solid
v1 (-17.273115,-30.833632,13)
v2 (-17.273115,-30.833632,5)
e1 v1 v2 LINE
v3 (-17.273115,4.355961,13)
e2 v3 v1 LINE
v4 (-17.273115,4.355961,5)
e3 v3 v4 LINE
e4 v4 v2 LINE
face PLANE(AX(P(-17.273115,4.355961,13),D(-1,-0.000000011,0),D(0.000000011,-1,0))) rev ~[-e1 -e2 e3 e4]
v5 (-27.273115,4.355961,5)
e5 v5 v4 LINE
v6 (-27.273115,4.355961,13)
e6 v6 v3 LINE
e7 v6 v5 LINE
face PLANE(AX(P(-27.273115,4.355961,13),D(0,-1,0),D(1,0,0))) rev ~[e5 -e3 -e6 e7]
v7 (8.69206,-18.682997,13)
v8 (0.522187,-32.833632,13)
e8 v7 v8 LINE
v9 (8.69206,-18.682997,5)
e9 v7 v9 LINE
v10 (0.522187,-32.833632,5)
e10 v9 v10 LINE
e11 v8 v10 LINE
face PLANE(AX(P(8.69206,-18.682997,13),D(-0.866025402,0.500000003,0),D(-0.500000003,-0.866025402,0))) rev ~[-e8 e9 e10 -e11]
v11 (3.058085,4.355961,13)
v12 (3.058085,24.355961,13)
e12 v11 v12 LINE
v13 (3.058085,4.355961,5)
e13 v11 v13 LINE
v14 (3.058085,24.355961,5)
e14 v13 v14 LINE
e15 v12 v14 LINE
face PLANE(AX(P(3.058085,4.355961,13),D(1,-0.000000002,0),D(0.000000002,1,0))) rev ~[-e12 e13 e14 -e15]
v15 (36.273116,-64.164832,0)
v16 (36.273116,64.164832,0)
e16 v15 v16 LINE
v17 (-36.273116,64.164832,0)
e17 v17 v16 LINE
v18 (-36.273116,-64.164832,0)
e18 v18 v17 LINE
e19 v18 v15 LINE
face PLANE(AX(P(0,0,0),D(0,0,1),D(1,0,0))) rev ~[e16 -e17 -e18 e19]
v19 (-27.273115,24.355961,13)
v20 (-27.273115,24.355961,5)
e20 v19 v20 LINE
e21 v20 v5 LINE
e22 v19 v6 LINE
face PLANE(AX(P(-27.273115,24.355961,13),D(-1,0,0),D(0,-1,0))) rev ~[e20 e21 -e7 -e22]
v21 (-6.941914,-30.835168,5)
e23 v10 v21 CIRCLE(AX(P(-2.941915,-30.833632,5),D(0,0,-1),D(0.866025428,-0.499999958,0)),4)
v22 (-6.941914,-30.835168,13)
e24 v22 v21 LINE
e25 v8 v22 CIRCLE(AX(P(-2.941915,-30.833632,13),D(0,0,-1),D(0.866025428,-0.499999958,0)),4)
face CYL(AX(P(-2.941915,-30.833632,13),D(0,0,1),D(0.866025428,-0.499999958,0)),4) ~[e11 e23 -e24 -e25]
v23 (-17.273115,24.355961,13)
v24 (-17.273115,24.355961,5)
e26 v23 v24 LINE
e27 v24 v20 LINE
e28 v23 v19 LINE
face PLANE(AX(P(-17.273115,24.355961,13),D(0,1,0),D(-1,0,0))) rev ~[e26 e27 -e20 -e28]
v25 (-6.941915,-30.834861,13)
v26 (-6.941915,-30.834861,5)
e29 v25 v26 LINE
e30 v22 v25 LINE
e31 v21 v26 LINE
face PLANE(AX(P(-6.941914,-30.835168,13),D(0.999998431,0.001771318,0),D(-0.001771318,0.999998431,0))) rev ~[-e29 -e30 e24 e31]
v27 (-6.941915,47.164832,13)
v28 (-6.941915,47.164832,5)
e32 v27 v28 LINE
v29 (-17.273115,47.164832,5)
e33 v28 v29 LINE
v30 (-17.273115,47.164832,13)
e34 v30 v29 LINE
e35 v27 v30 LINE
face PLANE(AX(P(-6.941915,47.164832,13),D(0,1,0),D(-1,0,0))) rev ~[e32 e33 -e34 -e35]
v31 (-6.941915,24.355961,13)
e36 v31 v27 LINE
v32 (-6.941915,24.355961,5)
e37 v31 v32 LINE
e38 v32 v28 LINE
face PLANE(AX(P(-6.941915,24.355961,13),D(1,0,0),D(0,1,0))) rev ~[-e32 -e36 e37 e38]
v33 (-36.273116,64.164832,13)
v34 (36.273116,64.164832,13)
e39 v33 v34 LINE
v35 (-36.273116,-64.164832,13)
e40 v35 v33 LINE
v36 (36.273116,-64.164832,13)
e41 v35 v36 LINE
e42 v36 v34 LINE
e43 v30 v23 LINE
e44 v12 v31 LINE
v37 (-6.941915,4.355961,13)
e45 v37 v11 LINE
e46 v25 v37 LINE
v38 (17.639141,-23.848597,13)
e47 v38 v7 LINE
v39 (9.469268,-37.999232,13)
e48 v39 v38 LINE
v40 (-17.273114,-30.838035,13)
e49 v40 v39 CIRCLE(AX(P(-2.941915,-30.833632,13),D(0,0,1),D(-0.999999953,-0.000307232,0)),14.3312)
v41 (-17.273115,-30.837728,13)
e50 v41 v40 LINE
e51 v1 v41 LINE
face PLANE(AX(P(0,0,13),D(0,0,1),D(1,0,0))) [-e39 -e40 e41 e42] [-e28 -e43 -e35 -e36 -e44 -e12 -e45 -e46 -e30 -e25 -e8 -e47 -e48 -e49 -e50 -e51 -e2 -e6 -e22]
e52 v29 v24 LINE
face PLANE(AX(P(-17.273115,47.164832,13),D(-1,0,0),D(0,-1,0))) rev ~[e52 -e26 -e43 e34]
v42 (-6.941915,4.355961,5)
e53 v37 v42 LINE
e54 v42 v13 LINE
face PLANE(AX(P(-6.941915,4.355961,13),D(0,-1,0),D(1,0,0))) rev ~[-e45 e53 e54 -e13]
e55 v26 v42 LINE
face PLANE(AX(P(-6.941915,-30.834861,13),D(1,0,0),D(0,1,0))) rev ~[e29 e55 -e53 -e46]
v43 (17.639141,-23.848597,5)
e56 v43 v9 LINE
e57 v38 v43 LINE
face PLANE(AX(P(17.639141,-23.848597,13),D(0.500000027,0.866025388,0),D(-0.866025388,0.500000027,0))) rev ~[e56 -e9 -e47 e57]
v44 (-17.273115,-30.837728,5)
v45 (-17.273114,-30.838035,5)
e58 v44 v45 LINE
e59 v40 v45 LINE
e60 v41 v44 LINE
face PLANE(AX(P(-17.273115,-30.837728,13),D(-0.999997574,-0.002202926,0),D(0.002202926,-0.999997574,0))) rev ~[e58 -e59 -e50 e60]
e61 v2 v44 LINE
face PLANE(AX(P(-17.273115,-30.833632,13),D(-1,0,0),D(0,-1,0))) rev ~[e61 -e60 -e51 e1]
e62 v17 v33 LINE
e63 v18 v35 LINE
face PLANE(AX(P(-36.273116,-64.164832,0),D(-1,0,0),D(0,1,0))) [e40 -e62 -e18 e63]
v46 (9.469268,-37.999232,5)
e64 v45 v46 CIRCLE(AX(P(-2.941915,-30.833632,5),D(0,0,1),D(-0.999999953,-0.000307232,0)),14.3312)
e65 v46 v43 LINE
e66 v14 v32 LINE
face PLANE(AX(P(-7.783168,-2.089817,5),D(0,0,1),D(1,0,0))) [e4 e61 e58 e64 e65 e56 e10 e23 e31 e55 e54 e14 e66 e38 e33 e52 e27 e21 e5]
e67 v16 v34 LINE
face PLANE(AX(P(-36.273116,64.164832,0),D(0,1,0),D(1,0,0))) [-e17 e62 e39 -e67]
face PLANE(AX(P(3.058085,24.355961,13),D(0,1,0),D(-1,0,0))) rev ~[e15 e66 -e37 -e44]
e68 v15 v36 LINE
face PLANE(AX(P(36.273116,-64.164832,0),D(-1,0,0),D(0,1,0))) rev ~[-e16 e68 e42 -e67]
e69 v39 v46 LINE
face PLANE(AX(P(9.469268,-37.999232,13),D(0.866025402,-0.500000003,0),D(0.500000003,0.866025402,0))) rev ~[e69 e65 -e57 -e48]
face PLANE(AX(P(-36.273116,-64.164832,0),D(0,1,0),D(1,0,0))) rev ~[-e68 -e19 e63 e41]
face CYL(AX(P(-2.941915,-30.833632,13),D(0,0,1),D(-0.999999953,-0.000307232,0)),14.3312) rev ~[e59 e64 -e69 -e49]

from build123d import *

# Parameters (mm, degrees)
F0_W     = 72.546231
F0_H     = 128.329664
F1_DEPTH = 13
F3_DEPTH = 8


# Not quite as in the source:
# - ends of sketch curves that miss each other by under 0.0002 mm in the source are joined


with BuildPart() as f1:
    # F0 (on Top) → F1 (new body)
    with BuildSketch(Plane.XY):
        with Locations((5e-07, 0)):
            Rectangle(F0_W, F0_H)
    extrude(amount=F1_DEPTH)

    # F2 (on face) → F3 (cut)
    with BuildSketch(Plane.XY.offset(13)):
        with BuildLine():
            Line((-6.941915, 24.355961), (-6.941915, 47.164832))
            Line((-6.941915, 47.164832), (-17.273115, 47.164832))
            Line((-17.273115, 47.164832), (-17.273115, 24.355961))
            Line((-17.273115, 24.355961), (-27.273115, 24.355961))
            Line((-27.273115, 24.355961), (-27.273115, 4.355961))
            Line((-27.273115, 4.355961), (-17.273115, 4.355961))
            Line((-17.273115, 4.355961), (-17.2731146267, -30.8336322155))
            Line((-17.2731146267, -30.8336322155), (-17.2731146267, -30.8377282155))
            Line((-17.2731146267, -30.8377282155), (-17.2731139504, -30.8380352155))
            ThreePointArc((-17.2731139504, -30.8380352155), (-6.6489757762, -44.6770778186), (9.4692682, -37.9992321155))
            Line((9.4692682, -37.9992321155), (17.6391412, -23.8485971155))
            Line((17.6391412, -23.8485971155), (8.69206, -18.682997))
            Line((8.69206, -18.682997), (0.522187, -32.833632))
            ThreePointArc((0.522187, -32.833632), (-3.9764490293, -34.6975341769), (-6.9419144165, -30.8351679998))
            Line((-6.9419144165, -30.8351679998), (-6.94191496, -30.8348611666))
            Line((-6.94191496, -30.8348611666), (-6.94191496, -30.8336322155))
            Line((-6.94191496, -30.8336322155), (-6.94191496, 4.355961))
            Line((-6.94191496, 4.355961), (3.058085, 4.355961))
            Line((3.058085, 4.355961), (3.05808504, 24.355961))
            Line((3.05808504, 24.355961), (-6.941915, 24.355961))
        make_face()
    extrude(amount=-F3_DEPTH, mode=Mode.SUBTRACT)


solid = f1.part
